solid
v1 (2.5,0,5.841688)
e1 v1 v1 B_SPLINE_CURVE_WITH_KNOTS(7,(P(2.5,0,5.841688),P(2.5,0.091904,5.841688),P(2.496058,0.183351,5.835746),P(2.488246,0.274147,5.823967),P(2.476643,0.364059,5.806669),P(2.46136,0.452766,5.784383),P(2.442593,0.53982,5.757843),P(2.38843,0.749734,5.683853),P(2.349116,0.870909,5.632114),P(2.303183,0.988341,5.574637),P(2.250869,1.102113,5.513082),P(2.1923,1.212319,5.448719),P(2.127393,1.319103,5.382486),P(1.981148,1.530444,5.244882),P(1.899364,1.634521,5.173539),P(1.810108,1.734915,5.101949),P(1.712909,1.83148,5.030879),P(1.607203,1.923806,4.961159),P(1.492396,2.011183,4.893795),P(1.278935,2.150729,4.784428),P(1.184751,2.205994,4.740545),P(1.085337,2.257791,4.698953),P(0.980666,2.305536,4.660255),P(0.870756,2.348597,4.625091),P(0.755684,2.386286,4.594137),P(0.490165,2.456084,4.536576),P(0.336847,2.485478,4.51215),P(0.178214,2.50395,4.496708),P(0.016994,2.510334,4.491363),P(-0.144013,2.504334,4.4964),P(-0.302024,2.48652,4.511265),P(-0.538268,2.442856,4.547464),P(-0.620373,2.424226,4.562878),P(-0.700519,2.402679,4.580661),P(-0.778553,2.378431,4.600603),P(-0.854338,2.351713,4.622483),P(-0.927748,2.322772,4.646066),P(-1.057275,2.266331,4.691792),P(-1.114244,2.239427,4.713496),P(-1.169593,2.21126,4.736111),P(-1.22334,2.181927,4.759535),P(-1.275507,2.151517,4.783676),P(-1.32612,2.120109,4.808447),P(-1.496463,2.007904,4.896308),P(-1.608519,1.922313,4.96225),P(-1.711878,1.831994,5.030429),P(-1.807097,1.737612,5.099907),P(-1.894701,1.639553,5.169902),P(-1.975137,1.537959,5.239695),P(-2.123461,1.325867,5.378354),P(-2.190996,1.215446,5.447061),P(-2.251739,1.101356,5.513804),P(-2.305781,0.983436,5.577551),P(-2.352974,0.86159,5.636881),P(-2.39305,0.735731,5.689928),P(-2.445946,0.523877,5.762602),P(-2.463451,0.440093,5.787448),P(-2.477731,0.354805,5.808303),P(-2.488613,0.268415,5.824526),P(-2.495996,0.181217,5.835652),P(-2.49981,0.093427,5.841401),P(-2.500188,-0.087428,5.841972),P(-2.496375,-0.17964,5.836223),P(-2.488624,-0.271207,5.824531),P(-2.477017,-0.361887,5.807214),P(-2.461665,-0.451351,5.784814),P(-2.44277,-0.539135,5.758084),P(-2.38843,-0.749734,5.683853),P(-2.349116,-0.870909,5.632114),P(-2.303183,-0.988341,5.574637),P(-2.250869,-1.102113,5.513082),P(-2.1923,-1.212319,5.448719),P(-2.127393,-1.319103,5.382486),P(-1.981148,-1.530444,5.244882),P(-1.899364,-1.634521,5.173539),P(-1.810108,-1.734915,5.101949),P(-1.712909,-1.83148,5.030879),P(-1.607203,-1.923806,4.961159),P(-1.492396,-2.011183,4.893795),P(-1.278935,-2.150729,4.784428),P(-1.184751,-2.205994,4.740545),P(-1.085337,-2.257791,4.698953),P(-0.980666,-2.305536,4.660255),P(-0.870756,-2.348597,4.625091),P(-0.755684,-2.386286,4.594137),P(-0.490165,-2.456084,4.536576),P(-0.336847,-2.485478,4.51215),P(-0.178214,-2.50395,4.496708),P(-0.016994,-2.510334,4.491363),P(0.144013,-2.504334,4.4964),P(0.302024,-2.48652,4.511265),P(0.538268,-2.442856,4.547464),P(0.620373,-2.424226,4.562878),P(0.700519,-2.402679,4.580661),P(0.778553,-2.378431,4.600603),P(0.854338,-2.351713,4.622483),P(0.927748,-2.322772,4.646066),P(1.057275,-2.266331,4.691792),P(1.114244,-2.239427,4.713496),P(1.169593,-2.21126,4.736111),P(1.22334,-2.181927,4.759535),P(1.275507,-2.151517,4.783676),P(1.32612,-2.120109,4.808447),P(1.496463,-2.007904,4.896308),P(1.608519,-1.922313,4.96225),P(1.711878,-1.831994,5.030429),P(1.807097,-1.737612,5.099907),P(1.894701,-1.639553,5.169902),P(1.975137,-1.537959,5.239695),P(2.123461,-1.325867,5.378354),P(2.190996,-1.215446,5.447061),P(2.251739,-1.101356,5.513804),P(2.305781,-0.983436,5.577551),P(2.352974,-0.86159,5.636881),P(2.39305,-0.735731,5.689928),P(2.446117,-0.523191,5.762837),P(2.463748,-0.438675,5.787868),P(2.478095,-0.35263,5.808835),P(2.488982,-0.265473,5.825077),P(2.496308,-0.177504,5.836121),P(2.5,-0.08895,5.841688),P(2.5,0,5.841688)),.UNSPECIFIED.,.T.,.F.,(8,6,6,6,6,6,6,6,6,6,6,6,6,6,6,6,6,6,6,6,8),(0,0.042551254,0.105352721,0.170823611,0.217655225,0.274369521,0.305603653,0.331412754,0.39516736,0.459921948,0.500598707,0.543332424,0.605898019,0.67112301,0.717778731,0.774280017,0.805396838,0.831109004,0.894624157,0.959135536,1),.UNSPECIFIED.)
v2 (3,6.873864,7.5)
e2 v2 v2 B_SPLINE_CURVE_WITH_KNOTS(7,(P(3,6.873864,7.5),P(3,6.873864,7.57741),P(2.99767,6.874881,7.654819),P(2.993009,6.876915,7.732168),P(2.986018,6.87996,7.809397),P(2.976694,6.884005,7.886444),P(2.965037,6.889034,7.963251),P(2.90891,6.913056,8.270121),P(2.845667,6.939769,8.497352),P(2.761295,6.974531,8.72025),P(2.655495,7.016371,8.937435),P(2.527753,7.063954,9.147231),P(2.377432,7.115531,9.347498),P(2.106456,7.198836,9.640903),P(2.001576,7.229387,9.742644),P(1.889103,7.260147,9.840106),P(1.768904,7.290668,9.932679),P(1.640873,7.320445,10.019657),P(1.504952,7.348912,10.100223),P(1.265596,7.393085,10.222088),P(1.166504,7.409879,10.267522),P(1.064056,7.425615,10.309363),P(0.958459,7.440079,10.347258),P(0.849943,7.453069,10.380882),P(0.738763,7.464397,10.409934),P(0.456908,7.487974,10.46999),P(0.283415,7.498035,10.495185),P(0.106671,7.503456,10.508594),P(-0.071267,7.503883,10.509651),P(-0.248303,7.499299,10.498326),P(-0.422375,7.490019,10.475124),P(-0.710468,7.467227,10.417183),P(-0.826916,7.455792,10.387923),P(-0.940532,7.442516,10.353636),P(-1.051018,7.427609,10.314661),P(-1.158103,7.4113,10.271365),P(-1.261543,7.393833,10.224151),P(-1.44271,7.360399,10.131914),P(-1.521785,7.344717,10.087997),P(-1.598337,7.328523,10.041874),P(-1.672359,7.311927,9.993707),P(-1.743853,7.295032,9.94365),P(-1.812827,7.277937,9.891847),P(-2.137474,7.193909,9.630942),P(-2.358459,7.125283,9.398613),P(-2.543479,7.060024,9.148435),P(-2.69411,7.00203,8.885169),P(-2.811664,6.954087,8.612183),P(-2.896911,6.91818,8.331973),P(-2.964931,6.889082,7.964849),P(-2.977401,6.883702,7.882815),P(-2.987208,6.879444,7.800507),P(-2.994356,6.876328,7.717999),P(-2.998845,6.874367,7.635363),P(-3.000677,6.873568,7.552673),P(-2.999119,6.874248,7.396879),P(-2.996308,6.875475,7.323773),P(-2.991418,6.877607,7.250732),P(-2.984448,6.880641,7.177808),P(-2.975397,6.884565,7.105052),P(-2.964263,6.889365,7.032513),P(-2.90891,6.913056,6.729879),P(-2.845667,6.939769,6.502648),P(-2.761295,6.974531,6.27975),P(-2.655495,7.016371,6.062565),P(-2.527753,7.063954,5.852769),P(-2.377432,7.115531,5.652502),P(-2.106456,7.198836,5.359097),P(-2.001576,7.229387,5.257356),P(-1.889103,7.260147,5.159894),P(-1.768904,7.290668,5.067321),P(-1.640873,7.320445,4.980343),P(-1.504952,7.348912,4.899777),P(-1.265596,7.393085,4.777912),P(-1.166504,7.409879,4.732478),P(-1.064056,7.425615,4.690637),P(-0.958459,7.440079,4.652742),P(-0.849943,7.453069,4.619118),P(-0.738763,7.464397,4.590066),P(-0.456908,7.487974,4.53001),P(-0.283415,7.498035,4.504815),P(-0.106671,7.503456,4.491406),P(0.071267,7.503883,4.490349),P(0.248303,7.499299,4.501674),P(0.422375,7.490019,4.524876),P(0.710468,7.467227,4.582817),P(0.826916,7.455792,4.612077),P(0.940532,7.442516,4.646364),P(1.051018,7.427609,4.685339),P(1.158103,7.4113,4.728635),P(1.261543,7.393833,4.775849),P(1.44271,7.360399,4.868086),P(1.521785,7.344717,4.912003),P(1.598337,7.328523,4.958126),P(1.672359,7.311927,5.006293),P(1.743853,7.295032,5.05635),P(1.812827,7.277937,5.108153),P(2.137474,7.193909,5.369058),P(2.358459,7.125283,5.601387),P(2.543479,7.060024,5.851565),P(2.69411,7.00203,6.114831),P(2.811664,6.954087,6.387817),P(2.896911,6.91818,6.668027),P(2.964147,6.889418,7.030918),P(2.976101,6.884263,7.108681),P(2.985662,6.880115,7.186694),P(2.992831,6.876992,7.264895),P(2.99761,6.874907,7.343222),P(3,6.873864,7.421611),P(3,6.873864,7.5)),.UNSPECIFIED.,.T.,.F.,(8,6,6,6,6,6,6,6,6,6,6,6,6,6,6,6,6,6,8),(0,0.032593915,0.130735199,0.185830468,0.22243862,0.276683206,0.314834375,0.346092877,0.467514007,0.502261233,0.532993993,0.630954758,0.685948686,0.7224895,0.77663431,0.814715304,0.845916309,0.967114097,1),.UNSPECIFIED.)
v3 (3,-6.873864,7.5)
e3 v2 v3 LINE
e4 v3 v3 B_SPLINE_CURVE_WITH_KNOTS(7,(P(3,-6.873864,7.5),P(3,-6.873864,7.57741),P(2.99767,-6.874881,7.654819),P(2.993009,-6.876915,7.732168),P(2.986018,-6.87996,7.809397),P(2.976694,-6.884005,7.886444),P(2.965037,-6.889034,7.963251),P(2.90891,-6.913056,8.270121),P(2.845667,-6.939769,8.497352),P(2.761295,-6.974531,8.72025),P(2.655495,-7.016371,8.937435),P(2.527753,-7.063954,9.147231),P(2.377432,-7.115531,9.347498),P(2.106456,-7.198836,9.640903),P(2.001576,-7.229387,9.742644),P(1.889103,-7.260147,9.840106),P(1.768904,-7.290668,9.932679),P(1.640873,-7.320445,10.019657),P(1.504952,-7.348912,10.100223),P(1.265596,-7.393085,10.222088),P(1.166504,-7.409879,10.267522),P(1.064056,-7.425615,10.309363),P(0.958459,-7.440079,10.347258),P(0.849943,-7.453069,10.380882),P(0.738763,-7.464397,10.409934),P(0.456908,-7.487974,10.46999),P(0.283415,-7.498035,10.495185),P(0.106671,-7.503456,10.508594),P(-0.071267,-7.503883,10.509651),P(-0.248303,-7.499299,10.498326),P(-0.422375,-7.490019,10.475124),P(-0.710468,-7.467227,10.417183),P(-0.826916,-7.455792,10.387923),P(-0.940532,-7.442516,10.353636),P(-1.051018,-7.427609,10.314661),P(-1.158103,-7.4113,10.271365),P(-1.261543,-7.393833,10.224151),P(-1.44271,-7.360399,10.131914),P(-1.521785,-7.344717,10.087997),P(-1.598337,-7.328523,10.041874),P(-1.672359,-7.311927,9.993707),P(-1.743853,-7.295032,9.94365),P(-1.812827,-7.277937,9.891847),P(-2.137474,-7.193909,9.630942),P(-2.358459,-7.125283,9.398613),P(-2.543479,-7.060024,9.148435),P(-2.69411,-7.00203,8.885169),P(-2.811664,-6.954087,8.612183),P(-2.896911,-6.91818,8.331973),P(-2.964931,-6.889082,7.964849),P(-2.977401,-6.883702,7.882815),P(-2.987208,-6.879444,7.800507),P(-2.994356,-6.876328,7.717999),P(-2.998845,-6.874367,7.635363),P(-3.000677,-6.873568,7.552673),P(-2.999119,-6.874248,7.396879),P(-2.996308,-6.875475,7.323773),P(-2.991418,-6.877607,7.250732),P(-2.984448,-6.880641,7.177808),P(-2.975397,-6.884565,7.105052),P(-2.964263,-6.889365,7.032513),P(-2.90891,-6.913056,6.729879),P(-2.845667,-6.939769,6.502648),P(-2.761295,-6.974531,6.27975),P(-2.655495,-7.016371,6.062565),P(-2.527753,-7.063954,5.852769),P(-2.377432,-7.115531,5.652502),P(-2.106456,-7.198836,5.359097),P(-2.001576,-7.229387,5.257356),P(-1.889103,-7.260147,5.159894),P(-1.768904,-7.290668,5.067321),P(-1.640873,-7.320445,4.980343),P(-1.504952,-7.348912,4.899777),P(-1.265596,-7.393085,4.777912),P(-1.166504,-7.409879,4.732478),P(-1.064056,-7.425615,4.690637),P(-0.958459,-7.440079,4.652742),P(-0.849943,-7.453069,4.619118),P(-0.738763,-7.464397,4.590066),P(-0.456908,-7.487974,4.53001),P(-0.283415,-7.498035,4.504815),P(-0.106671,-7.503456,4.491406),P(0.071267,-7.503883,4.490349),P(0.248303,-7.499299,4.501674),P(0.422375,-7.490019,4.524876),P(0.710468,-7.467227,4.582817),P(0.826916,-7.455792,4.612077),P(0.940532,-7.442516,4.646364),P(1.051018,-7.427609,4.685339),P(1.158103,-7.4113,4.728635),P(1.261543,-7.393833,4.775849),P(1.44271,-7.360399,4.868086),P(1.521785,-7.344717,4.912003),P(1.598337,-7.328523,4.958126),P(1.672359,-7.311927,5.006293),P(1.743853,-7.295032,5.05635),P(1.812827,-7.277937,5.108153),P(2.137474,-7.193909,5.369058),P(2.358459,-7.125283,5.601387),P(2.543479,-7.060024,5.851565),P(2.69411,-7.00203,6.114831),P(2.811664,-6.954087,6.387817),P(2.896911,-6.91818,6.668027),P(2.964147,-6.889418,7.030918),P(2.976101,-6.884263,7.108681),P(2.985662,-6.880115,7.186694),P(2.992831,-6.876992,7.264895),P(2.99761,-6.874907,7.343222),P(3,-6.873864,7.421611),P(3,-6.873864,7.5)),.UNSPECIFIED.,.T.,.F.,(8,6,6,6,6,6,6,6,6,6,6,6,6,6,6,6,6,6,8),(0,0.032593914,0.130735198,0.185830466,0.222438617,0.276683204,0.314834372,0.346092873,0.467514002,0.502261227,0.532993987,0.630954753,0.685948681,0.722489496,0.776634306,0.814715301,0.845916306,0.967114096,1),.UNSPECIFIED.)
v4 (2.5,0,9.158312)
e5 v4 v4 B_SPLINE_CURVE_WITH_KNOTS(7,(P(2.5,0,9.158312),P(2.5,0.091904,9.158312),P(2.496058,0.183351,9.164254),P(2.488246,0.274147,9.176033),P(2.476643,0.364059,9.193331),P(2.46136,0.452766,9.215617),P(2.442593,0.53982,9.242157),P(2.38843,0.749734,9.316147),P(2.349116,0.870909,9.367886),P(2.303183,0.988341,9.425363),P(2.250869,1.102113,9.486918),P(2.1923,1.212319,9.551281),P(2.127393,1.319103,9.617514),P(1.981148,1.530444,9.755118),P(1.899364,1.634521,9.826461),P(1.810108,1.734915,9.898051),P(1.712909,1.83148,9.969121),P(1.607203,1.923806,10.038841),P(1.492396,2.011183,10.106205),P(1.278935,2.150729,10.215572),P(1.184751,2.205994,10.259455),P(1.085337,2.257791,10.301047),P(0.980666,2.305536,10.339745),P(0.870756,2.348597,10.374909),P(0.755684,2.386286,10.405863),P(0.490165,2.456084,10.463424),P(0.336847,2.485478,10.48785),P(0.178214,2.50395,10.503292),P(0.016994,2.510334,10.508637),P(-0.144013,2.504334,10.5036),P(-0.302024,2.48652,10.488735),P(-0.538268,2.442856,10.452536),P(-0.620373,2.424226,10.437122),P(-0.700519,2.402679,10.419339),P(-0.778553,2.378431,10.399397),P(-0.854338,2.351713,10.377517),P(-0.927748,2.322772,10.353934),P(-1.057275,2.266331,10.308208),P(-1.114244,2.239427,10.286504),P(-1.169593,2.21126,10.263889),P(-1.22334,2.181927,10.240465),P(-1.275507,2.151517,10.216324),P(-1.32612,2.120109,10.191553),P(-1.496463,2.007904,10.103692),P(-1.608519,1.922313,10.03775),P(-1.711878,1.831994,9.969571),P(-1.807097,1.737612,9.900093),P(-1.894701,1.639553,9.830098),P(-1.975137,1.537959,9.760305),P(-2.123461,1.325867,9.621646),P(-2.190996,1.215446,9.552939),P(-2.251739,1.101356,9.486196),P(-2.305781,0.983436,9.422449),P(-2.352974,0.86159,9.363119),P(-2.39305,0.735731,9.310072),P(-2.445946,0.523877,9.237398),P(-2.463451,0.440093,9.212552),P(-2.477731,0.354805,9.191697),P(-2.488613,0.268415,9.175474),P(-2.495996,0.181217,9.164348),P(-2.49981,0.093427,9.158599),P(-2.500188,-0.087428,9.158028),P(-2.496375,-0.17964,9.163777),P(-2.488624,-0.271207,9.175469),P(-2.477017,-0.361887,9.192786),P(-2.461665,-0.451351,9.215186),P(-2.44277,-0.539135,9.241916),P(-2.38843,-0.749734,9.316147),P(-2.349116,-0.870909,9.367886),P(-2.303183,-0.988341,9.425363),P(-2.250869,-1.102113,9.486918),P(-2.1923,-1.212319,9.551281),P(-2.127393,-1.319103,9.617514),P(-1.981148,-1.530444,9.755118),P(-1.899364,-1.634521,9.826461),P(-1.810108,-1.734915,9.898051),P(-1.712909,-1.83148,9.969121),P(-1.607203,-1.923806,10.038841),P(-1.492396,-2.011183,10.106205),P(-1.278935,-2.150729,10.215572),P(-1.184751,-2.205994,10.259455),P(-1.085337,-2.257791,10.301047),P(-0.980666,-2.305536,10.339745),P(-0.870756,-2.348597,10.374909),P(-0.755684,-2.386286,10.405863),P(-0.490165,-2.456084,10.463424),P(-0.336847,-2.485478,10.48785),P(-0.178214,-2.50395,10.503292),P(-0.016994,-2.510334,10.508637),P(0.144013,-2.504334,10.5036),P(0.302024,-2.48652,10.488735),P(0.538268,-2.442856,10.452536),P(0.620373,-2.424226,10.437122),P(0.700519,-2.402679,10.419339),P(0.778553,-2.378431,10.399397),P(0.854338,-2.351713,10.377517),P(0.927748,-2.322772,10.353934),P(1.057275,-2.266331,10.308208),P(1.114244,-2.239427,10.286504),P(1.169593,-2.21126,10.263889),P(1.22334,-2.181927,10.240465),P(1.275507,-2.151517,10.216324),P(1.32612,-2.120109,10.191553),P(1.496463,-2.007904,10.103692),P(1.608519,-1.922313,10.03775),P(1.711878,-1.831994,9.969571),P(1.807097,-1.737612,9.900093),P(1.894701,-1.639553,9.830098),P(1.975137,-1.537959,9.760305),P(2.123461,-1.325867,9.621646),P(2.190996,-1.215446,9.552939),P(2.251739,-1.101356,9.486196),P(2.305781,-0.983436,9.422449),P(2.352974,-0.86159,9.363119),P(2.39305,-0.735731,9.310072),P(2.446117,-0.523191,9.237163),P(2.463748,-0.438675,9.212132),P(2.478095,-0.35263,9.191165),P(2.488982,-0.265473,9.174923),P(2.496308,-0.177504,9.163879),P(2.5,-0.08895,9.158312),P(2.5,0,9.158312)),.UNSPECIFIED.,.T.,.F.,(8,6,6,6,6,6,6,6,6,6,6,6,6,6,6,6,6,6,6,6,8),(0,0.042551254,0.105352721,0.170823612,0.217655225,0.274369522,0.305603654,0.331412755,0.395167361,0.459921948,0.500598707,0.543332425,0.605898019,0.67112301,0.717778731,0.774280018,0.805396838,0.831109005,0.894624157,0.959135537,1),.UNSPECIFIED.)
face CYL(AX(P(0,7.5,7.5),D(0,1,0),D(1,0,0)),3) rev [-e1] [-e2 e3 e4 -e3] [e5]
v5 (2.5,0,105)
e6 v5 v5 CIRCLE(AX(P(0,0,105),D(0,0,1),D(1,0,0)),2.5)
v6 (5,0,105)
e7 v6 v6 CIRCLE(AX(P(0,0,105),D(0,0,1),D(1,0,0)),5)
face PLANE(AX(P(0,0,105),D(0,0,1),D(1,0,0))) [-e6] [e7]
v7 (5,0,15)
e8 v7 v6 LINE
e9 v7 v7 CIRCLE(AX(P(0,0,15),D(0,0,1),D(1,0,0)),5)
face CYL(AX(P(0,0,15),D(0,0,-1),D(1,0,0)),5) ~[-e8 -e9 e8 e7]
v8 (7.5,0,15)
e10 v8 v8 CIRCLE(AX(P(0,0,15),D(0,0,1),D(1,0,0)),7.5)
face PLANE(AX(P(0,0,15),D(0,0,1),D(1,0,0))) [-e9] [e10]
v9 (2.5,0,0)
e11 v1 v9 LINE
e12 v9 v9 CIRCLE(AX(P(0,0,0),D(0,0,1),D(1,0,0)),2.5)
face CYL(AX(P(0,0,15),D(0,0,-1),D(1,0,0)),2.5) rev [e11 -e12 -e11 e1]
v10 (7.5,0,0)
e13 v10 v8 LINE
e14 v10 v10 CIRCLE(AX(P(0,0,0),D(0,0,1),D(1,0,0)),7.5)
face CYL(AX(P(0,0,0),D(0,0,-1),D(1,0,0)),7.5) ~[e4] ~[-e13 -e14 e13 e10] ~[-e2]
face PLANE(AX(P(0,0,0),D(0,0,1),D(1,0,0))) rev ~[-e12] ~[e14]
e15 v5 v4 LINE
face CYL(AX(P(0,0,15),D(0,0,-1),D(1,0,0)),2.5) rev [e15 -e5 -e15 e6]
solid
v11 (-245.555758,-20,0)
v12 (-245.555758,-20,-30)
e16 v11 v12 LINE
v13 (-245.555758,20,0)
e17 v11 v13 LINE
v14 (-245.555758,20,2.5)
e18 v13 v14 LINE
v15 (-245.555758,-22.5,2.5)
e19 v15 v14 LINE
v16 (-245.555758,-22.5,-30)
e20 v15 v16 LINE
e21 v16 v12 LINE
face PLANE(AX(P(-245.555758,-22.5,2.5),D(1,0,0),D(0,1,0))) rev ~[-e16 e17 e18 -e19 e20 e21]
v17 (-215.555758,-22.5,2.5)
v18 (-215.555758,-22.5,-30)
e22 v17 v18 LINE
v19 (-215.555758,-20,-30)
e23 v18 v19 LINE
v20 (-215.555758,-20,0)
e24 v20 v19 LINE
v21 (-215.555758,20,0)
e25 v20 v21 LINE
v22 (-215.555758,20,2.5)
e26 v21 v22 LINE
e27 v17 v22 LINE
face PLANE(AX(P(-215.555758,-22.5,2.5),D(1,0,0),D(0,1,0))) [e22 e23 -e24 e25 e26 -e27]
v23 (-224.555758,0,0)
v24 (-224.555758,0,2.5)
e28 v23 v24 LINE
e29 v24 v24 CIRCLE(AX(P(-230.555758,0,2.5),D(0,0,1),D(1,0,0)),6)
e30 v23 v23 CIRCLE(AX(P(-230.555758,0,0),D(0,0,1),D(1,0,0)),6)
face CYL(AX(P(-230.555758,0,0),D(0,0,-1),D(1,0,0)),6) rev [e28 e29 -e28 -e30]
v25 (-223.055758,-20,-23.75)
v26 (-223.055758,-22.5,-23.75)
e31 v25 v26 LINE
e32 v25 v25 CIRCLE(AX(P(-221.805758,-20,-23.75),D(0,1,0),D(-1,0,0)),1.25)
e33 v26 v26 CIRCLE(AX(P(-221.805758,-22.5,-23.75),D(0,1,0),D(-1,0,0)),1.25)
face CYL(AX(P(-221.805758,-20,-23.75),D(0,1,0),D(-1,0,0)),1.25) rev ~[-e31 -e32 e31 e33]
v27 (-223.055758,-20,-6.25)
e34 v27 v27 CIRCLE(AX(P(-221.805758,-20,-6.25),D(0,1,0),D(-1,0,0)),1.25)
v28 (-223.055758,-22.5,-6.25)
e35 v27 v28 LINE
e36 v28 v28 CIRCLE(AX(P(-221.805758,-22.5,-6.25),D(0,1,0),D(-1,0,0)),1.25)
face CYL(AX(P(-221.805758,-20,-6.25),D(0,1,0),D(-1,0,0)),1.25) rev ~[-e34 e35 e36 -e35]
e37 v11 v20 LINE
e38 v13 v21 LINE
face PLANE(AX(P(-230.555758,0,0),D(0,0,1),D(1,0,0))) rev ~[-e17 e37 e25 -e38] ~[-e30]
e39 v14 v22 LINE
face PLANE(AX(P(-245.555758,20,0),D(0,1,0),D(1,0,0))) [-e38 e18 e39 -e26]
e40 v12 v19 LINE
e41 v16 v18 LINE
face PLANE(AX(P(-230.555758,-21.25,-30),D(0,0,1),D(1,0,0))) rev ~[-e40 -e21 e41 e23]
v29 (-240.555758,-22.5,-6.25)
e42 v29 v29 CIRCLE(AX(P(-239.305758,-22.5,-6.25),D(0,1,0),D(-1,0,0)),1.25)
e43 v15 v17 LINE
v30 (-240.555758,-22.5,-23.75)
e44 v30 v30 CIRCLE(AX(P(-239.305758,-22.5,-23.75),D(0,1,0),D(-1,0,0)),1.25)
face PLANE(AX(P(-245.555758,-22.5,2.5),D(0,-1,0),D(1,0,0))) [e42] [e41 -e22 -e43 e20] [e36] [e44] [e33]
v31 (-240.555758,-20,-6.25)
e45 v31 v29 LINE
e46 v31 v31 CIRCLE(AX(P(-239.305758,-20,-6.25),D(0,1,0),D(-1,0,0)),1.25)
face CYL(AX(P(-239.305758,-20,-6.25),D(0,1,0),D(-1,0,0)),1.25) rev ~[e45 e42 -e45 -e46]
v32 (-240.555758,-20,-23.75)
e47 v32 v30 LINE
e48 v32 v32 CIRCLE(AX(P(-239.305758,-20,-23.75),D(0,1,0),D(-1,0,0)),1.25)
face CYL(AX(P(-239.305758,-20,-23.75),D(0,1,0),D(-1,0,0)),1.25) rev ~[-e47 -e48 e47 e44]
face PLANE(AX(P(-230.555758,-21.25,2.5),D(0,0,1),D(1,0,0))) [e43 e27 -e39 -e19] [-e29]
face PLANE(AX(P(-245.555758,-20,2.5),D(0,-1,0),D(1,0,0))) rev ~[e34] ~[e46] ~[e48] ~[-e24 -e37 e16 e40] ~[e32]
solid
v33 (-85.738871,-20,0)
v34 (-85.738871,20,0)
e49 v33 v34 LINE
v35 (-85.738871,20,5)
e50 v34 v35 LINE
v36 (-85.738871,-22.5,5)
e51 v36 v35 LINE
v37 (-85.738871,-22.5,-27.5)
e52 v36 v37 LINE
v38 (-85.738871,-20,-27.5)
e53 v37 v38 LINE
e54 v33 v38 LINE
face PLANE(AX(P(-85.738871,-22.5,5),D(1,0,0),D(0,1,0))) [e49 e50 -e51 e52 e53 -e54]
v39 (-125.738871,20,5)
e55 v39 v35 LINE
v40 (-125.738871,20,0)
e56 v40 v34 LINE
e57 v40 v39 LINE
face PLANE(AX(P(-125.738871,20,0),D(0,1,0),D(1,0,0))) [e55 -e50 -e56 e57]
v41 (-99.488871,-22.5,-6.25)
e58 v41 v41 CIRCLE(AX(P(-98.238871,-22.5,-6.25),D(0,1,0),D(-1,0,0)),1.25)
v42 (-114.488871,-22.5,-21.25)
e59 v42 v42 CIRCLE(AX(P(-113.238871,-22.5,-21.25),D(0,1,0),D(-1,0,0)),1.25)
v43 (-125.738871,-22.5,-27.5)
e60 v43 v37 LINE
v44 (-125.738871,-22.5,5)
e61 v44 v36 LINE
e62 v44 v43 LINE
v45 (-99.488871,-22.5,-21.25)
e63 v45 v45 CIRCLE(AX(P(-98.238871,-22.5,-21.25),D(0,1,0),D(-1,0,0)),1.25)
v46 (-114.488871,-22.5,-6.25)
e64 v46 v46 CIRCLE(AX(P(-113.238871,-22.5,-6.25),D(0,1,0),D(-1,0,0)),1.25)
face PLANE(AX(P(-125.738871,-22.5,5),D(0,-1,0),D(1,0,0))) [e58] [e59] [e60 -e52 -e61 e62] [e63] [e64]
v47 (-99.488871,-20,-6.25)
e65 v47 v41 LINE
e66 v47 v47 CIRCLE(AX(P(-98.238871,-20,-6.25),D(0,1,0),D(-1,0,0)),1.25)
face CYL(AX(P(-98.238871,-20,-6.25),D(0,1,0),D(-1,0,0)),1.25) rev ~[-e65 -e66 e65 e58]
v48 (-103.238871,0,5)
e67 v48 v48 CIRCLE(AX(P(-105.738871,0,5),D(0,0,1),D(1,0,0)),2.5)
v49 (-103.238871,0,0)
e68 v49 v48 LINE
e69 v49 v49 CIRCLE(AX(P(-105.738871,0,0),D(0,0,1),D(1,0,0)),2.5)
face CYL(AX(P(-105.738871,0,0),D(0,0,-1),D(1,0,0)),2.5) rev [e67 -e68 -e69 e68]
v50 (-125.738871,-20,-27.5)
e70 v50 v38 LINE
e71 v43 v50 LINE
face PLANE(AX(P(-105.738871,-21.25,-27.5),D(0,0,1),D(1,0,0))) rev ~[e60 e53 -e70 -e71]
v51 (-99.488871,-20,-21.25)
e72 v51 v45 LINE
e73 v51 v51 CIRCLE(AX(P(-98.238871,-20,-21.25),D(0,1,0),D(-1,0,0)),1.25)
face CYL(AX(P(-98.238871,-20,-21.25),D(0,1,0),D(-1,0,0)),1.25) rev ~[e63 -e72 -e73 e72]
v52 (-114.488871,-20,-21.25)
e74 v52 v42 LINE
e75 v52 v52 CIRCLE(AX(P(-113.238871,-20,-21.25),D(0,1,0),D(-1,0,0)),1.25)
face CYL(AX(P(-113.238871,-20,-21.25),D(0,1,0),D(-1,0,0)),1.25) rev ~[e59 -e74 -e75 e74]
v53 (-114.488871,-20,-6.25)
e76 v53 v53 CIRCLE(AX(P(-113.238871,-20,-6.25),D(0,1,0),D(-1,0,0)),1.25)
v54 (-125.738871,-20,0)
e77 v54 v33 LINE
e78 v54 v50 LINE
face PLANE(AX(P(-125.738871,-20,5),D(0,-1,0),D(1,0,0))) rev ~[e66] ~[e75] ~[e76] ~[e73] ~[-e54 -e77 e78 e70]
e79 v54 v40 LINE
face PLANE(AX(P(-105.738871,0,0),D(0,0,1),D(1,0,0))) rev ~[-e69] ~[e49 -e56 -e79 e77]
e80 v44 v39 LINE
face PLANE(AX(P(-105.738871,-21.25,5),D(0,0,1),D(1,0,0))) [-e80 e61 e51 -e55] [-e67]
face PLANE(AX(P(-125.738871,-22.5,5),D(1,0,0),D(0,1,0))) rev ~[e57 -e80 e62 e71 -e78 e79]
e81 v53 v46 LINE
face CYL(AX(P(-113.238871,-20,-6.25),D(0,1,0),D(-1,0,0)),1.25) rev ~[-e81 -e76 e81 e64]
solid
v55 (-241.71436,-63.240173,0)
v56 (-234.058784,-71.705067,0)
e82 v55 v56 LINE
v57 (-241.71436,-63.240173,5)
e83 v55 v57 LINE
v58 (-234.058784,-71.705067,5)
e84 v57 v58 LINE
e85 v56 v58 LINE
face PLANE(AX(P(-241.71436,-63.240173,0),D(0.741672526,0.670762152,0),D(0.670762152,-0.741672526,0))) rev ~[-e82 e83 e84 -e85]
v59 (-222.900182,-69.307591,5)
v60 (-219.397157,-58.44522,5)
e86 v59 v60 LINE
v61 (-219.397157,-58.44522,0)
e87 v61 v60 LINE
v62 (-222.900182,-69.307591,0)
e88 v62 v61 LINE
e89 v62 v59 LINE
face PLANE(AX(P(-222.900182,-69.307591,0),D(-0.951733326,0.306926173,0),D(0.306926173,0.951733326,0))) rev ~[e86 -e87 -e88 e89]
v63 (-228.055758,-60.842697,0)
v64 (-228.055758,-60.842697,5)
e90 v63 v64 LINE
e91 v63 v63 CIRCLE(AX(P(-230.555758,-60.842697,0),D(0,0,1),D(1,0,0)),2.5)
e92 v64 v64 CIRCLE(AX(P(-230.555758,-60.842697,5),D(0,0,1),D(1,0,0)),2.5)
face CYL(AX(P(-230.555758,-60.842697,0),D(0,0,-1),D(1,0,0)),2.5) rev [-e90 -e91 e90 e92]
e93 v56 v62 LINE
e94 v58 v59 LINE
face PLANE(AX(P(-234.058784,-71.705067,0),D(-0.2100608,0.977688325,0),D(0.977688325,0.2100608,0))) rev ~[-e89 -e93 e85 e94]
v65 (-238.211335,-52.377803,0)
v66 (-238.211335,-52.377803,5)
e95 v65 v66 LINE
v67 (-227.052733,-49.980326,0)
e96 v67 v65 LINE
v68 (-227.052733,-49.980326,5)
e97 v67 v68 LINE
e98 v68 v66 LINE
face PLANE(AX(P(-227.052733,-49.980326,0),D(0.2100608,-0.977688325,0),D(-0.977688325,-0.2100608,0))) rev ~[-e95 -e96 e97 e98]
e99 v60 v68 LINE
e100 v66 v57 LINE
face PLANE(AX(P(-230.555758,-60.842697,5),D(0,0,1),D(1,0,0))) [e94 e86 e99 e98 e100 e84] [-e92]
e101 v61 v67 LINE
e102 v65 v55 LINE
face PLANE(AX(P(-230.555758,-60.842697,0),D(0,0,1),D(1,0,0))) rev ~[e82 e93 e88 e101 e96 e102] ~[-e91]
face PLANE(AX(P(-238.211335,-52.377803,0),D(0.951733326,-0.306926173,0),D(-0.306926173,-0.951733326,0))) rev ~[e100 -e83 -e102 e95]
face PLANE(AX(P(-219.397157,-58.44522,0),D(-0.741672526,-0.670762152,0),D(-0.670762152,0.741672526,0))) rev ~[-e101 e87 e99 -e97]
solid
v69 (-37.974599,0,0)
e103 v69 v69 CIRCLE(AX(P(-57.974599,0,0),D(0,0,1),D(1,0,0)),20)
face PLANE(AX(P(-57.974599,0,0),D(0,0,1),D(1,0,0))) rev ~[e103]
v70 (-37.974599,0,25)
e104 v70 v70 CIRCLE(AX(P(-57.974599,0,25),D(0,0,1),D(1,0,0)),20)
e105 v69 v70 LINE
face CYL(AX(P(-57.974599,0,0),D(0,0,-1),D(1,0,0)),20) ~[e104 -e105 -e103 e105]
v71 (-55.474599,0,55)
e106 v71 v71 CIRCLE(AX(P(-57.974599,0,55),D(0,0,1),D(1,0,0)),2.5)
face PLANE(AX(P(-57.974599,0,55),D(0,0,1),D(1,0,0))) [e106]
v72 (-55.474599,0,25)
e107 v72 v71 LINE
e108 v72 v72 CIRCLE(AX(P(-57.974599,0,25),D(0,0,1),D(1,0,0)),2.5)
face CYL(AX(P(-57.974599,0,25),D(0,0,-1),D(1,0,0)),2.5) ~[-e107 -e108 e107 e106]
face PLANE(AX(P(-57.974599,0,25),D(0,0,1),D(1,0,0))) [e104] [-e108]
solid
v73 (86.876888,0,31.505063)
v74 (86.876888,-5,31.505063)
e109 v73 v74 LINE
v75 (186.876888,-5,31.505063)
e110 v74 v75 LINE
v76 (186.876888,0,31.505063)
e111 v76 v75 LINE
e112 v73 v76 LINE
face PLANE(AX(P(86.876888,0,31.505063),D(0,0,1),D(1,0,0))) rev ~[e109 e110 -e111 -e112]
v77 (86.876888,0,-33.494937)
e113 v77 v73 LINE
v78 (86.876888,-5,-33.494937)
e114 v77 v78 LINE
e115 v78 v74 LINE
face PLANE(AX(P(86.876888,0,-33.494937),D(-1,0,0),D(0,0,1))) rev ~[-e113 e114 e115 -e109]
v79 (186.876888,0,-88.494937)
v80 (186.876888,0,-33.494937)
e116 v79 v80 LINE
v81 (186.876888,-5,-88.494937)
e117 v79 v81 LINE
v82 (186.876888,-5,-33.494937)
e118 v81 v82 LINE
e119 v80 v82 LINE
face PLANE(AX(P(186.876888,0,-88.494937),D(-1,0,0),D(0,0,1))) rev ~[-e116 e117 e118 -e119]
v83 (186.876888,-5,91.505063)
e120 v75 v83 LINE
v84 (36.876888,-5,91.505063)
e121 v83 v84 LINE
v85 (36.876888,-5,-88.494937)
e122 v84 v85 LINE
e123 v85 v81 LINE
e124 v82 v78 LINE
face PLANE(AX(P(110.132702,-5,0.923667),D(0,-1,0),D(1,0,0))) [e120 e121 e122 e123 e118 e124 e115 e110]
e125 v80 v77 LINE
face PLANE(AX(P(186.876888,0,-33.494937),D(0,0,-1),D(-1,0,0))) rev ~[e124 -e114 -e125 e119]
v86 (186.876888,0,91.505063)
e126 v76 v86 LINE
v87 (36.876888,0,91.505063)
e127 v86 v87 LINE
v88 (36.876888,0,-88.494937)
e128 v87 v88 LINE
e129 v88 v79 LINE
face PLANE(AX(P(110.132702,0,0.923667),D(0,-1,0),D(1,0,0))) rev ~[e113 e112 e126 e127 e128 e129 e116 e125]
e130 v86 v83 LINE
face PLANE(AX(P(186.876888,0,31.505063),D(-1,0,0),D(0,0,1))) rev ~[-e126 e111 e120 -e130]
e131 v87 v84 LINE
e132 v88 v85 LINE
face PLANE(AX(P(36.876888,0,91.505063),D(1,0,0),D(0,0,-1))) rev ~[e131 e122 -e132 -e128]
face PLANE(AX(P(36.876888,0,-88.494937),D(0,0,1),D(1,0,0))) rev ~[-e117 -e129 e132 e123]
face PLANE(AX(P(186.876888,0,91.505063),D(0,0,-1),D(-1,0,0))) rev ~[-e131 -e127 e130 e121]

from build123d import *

# Parameters (mm, degrees)
F0_R      = 2.5
F1_DEPTH  = 15
F2_R      = 5
F2_R_2    = 2.5
F3_DEPTH  = 90
F5_R      = 3
F6_DEPTH  = 15.001
F0_R_2    = 20
F7_DEPTH  = 25
F8_R      = 2.5
F9_DEPTH  = 30
F0_W      = 40
F0_H      = 40
F10_DEPTH = 5
F11_W     = 40
F11_H     = 2.5
F12_DEPTH = 32.5
F14_DEPTH = 5
F0_W_2    = 30
F0_R_3    = 6
F16_DEPTH = 2.5
F17_W     = 30
F17_H     = 2.5
F18_DEPTH = 32.5
F19_DEPTH = 5
F20_R     = 1.25
F21_DEPTH = 2.5
F22_R     = 1.25
F23_DEPTH = 2.5


with BuildPart() as f1:
    # F0 (on Top) → F1 (new body)
    with BuildSketch(Plane.XY):
        with BuildLine():
            ThreePointArc((0, 7.5), (-5.3033008589, -5.3033008589), (7.5, 0))
            ThreePointArc((7.5, 0), (5.3033008589, 5.3033008589), (0, 7.5))
        make_face()
        Circle(F0_R, mode=Mode.SUBTRACT)
    extrude(amount=F1_DEPTH)

    # F2 (on face) → F3 (join)
    with BuildSketch(Plane.XY.offset(15)):
        Circle(F2_R)
        Circle(F2_R_2, mode=Mode.SUBTRACT)
    extrude(amount=F3_DEPTH)

    # F5 (on face) → F6 (cut, through all)
    with BuildSketch(Plane.XZ.offset(-7.5)):
        with Locations((0, 7.5)):
            Circle(F5_R)
    extrude(amount=F6_DEPTH, mode=Mode.SUBTRACT)


with BuildPart() as f7:
    # F0 (on Top) → F7 (new body)
    with BuildSketch(Plane.XY):
        with Locations((-57.9745993018, 0)):
            Circle(F0_R_2)
    extrude(amount=F7_DEPTH)

    # F8 (on face) → F9 (join)
    with BuildSketch(Plane.XY.offset(25)):
        with Locations((-57.9745993018, 0)):
            Circle(F8_R)
    extrude(amount=F9_DEPTH)


with BuildPart() as f10:
    # F0 (on Top) → F10 (new body)
    with BuildSketch(Plane.XY):
        with Locations((-105.7388707995, 0)):
            Rectangle(F0_W, F0_H)
        with Locations((-105.7388707995, 0)):
            Circle(F0_R, mode=Mode.SUBTRACT)
    extrude(amount=F10_DEPTH)

    # F11 (on face) → F12 (join)
    with BuildSketch(Plane.XY.offset(5)):
        with Locations((-105.7388707995, -21.25)):
            Rectangle(F11_W, F11_H)
    extrude(amount=-F12_DEPTH)

    # F20 (on face) → F21 (cut, through all)
    with BuildSketch(Plane(origin=(0, -20, 0), x_dir=(-1, 0, 0), z_dir=(0, 1, 0))):
        with Locations((98.2388707995, -6.25)):
            Circle(F20_R)
        with Locations((113.2388707995, -6.25)):
            Circle(F20_R)
        with Locations((113.2388707995, -21.25)):
            Circle(F20_R)
        with Locations((98.2388707995, -21.25)):
            Circle(F20_R)
    extrude(amount=-F21_DEPTH, mode=Mode.SUBTRACT)


with BuildPart() as f14:
    # F13 (on Front) → F14 (new body)
    with BuildSketch(Plane.XZ):
        Polygon((186.8768878281, 91.5050628316), (36.8768878281, 91.5050628316), (36.8768878281, -88.4949371684), (186.8768878281, -88.4949371684), (186.8768878281, -33.4949371684), (86.8768878281, -33.4949371684), (86.8768878281, 31.5050628316), (186.8768878281, 31.5050628316), align=None)
    extrude(amount=F14_DEPTH)


with BuildPart() as f16:
    # F0 (on Top) → F16 (new body)
    with BuildSketch(Plane.XY):
        with Locations((-230.5557584763, 0)):
            Rectangle(F0_W_2, F0_H)
        with Locations((-230.5557584763, 0)):
            Circle(F0_R_3, mode=Mode.SUBTRACT)
    extrude(amount=F16_DEPTH)

    # F17 (on face) → F18 (join)
    with BuildSketch(Plane.XY.offset(2.5)):
        with Locations((-230.5557584763, -21.25)):
            Rectangle(F17_W, F17_H)
    extrude(amount=-F18_DEPTH)

    # F22 (on face) → F23 (cut, through all)
    with BuildSketch(Plane(origin=(0, -20, 0), x_dir=(-1, 0, 0), z_dir=(0, 1, 0))):
        with Locations((221.8057584763, -6.25)):
            Circle(F22_R)
        with Locations((221.8057584763, -23.75)):
            Circle(F22_R)
        with Locations((239.3057584763, -23.75)):
            Circle(F22_R)
        with Locations((239.3057584763, -6.25)):
            Circle(F22_R)
    extrude(amount=-F23_DEPTH, mode=Mode.SUBTRACT)


with BuildPart() as f19:
    # F0 (on Top) → F19 (new body)
    with BuildSketch(Plane.XY):
        Polygon((-222.9001823011, -69.3075905842), (-219.3971571383, -58.4452201324), (-227.0527333135, -49.9803261255), (-238.2113346515, -52.3778025704), (-241.7143598142, -63.2401730222), (-234.058783639, -71.7050670291), align=None)
        with Locations((-230.5557584763, -60.8426965773)):
            Circle(F0_R, mode=Mode.SUBTRACT)
    extrude(amount=F19_DEPTH)


solid = Compound([f1.part, f7.part, f10.part, f14.part, f16.part, f19.part])
